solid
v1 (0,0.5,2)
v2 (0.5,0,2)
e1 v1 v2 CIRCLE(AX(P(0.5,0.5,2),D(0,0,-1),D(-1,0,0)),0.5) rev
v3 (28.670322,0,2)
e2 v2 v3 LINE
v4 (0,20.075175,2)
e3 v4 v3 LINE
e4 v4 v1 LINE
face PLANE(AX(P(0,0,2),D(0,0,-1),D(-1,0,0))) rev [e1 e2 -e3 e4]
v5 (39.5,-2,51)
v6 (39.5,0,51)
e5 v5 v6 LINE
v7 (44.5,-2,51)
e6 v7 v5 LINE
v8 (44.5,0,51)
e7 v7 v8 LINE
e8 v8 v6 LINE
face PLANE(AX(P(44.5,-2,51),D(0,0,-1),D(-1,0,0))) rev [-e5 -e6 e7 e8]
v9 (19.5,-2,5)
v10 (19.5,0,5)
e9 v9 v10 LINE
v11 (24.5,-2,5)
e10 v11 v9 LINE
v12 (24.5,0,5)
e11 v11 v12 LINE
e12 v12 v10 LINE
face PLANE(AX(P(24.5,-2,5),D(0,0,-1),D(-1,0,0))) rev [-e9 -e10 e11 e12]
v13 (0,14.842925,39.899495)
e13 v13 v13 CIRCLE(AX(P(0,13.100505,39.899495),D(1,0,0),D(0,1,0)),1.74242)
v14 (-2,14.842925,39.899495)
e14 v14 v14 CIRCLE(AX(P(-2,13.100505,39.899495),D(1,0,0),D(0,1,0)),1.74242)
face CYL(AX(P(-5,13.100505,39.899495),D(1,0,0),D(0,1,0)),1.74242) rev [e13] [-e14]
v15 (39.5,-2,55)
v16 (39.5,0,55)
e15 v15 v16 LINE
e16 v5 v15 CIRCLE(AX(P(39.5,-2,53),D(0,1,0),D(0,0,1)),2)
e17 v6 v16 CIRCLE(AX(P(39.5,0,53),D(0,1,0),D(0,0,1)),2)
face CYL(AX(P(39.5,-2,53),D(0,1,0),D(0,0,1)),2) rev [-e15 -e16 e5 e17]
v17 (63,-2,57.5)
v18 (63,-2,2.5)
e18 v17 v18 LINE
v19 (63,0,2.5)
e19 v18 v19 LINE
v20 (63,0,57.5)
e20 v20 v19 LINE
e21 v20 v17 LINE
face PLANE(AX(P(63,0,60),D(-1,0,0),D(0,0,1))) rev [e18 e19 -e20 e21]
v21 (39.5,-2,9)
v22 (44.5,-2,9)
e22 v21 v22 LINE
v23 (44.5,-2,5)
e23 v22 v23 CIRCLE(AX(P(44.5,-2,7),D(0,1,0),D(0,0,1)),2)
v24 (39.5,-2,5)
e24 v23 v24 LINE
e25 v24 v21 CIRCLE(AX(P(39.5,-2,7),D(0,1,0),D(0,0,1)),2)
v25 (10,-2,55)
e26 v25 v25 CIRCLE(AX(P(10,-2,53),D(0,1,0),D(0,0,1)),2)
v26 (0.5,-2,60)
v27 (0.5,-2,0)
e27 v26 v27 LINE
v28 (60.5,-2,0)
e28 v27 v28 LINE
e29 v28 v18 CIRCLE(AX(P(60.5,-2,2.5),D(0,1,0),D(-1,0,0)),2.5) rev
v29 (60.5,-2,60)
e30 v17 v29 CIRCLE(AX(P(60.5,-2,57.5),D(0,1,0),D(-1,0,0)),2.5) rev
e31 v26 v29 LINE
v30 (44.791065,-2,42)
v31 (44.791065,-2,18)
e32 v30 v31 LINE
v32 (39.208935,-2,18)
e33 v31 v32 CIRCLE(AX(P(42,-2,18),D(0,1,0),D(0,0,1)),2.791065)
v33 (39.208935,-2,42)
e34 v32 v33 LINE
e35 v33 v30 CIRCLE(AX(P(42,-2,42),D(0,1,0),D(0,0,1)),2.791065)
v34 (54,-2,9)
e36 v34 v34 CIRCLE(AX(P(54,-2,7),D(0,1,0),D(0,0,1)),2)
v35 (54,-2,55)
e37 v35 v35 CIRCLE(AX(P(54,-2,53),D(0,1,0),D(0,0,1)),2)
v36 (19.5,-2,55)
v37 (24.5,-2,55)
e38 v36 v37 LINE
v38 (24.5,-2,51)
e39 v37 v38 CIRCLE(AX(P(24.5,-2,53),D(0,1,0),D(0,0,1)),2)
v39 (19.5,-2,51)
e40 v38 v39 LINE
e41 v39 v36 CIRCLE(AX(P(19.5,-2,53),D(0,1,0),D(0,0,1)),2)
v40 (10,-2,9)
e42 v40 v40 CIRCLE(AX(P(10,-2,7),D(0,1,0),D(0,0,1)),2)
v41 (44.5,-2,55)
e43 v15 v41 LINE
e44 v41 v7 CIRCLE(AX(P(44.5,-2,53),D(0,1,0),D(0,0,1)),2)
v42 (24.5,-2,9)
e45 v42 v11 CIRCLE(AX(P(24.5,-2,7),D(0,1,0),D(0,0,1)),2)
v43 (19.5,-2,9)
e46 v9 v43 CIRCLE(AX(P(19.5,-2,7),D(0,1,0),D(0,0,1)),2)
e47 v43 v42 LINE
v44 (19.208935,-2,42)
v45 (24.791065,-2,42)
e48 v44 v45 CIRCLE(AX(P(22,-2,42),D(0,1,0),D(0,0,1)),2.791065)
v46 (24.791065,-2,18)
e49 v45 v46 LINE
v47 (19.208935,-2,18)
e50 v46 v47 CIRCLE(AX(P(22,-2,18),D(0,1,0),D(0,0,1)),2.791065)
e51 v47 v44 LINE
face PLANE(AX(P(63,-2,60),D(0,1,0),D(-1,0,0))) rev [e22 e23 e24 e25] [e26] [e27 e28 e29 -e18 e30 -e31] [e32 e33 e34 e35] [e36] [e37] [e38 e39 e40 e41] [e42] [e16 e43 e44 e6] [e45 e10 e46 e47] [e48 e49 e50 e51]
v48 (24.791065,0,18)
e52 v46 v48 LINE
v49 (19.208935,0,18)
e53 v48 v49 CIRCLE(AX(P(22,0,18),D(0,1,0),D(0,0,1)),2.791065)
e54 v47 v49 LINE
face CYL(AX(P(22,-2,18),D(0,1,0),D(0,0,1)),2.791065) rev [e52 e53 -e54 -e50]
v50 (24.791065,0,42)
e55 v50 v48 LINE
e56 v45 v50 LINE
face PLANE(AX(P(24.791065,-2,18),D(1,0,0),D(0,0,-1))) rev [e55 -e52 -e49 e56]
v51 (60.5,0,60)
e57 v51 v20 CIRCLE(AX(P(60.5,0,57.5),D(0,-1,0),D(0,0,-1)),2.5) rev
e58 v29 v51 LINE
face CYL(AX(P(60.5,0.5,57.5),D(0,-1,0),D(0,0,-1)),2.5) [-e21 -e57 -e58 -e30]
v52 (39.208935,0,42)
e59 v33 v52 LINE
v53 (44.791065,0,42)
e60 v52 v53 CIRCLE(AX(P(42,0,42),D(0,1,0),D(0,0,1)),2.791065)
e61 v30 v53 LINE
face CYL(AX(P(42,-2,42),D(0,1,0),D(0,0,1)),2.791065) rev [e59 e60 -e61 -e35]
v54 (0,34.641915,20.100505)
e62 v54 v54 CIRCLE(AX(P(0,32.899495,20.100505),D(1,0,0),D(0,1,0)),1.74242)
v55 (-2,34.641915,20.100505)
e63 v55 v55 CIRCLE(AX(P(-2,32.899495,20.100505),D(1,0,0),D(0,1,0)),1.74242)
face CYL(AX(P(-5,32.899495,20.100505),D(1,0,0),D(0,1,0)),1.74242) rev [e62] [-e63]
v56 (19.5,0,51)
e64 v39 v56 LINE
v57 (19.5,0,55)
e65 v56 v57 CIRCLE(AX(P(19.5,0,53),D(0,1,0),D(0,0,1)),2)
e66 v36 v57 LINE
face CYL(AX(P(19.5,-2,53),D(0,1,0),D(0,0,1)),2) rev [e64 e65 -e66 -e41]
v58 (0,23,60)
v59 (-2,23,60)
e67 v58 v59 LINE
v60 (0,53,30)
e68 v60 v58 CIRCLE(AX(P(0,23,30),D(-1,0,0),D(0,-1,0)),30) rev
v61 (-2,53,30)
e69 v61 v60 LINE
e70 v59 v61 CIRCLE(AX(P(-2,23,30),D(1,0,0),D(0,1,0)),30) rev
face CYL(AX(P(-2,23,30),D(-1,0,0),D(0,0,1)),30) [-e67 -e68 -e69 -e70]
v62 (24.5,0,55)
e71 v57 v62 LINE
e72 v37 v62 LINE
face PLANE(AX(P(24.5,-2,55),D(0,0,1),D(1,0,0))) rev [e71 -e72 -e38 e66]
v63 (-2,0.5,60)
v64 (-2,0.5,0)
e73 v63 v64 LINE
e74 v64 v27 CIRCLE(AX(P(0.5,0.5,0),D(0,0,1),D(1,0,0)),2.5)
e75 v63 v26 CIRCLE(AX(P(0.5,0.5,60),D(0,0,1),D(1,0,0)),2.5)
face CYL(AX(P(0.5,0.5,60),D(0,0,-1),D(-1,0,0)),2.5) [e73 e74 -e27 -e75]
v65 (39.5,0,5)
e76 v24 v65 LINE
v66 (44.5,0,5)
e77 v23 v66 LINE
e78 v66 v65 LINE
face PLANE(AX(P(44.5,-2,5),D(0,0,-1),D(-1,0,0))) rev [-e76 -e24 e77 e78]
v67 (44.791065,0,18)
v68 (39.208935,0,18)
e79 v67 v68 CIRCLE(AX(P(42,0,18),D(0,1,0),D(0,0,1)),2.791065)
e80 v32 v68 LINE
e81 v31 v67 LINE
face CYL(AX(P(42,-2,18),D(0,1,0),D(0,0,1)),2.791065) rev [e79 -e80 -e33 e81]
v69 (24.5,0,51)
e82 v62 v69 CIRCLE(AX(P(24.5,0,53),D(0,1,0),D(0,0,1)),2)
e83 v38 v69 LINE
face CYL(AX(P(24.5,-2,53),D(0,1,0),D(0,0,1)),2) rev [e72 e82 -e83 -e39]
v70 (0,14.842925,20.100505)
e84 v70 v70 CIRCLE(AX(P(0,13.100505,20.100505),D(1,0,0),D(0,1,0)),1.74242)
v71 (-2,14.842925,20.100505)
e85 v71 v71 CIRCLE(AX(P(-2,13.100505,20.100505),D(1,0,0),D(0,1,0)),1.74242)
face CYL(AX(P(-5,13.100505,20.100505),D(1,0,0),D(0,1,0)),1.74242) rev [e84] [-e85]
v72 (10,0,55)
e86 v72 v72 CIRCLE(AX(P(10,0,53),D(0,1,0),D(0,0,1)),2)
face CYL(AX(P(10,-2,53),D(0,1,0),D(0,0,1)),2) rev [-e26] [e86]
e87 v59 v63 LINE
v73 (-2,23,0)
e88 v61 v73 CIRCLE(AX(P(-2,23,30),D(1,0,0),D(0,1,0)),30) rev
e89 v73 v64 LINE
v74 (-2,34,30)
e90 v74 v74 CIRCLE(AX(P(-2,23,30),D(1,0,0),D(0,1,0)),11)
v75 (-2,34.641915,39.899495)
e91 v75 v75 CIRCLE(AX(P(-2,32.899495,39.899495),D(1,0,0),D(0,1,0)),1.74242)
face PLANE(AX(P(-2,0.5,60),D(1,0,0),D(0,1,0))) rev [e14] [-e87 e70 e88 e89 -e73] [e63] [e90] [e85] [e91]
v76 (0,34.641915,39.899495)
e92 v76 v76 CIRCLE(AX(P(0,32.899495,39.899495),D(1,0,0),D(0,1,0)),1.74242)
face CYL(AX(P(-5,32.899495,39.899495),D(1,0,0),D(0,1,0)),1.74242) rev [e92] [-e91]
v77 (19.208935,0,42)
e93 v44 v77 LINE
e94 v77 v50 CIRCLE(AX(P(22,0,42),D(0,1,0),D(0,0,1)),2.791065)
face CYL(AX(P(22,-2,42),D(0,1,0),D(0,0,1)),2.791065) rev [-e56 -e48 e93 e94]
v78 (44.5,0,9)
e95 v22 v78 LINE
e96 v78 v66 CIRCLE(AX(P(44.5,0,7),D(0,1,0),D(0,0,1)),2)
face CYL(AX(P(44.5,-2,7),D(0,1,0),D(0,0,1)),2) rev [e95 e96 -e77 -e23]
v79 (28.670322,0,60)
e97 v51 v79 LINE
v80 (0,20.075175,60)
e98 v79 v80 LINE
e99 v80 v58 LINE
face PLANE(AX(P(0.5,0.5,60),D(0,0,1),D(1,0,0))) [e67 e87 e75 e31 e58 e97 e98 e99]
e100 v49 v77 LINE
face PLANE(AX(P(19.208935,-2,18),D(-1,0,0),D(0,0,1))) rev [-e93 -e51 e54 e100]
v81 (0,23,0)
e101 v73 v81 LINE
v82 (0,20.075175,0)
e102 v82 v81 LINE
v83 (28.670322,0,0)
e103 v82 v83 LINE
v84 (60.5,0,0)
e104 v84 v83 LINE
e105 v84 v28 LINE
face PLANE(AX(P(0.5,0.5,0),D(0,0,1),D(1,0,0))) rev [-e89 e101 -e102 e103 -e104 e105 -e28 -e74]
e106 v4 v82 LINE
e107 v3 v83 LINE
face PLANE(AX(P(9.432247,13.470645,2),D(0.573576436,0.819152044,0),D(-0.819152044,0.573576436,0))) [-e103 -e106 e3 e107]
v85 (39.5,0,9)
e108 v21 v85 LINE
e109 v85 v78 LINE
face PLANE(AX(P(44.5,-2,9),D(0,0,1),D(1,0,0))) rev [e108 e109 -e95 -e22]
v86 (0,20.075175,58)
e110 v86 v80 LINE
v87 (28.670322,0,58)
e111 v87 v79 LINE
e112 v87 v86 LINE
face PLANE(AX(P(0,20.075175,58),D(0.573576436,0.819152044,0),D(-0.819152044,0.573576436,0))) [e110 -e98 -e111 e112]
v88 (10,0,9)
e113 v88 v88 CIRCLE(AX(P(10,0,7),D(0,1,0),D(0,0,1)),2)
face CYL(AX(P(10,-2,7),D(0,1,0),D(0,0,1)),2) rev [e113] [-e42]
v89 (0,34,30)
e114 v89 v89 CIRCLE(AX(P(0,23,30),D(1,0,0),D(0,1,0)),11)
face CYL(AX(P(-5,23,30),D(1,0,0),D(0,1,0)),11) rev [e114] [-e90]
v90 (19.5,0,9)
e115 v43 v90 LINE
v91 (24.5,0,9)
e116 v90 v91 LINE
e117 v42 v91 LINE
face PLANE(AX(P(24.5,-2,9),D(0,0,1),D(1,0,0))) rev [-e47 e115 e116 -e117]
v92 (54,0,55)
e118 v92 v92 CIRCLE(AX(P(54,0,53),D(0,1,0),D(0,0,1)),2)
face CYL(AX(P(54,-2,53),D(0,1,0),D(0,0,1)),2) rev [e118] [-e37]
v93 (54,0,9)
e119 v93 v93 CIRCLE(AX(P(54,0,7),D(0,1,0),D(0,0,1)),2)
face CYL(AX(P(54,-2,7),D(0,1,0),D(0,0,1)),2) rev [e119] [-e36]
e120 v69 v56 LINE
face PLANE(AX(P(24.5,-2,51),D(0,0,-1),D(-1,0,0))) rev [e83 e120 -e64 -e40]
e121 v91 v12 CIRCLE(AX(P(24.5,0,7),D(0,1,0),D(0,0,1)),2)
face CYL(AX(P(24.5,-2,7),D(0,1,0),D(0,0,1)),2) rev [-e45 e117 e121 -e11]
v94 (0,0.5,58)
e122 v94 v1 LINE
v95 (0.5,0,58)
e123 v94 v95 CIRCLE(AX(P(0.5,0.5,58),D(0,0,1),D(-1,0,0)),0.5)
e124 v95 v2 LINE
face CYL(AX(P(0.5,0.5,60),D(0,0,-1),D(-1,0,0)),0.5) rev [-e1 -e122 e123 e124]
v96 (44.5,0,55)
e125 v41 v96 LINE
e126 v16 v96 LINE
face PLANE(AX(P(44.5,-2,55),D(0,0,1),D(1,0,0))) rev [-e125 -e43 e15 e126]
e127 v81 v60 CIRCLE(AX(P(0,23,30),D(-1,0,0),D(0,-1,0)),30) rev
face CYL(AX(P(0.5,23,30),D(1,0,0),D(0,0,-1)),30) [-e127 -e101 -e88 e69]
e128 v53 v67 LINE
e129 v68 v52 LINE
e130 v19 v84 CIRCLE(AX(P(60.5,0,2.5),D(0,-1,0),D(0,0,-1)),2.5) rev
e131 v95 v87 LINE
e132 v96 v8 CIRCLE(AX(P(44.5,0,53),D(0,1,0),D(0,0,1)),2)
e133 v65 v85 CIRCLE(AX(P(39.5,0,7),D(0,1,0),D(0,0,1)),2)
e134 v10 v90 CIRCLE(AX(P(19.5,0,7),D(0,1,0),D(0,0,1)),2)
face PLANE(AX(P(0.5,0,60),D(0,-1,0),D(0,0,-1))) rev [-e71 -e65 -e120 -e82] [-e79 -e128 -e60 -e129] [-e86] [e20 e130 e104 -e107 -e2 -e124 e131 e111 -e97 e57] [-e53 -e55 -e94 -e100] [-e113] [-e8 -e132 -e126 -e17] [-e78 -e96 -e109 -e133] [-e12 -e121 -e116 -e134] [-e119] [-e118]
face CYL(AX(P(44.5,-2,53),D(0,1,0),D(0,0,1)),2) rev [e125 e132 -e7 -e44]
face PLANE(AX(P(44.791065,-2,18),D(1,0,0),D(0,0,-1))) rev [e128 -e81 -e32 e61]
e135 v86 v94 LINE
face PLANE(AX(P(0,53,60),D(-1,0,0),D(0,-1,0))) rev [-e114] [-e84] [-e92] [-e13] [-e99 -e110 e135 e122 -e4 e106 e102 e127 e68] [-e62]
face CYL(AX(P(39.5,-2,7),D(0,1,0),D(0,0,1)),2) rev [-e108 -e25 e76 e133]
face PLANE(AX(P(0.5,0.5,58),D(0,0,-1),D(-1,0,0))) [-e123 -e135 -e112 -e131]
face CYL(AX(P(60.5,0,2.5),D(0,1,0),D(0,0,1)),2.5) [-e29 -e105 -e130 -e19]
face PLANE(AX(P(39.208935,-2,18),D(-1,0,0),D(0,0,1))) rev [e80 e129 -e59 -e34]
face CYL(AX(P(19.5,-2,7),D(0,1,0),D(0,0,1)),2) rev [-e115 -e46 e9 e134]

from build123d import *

# Parameters (mm, degrees)
BOSS_EXTRUDE1_DEPTH = 60
FILLET2_R           = 2.5
FILLET3_R           = 2.5
FILLET4_R           = 30
FILLET5_R           = 30
SKETCH3_R           = 11
SKETCH3_R_2         = 1.742420083
CUT_EXTRUDE1_DEPTH  = 5
BOSS_EXTRUDE3_START = -2
BOSS_EXTRUDE3_DEPTH = 2
BOSS_EXTRUDE4_DEPTH = 2
SKETCH7_R           = 2
CUT_EXTRUDE2_DEPTH  = 2


with BuildPart() as part:
    # Sketch2 → Boss-Extrude1 (new body)
    with BuildSketch(Plane.XY):
        with BuildLine():
            Line((0.5, 0), (63, 0))
            Line((63, 0), (63, -2))
            Line((63, -2), (0.5, -2))
            ThreePointArc((0.5, -2), (-1.267766953, -1.267766953), (-2, 0.5))
            Line((-2, 0.5), (-2, 53))
            Line((-2, 53), (0, 53))
            Line((0, 53), (0, 0.5))
            ThreePointArc((0, 0.5), (0.146446609, 0.146446609), (0.5, 0))
        make_face()
    extrude(amount=BOSS_EXTRUDE1_DEPTH)

    # Fillet2
    fillet2_edges = [part.edges().sort_by_distance(p)[0] for p in [
        (63, -1, 60),
    ]]
    fillet(fillet2_edges, radius=FILLET2_R)

    # Fillet3
    fillet3_edges = [part.edges().sort_by_distance(p)[0] for p in [
        (63, -1, 0),
    ]]
    fillet(fillet3_edges, radius=FILLET3_R)

    # Fillet4
    fillet4_edges = [part.edges().sort_by_distance(p)[0] for p in [
        (-1, 53, 60),
    ]]
    fillet(fillet4_edges, radius=FILLET4_R)

    # Fillet5
    fillet5_edges = [part.edges().sort_by_distance(p)[0] for p in [
        (-1, 53, 0),
    ]]
    fillet(fillet5_edges, radius=FILLET5_R - 0.0001)  # a hair under: the kernel refuses the full size

    # Sketch3 → Cut-Extrude1 (cut)
    with BuildSketch(Plane(origin=(0, 0, 0), x_dir=(0, 0, -1), z_dir=(1, 0, 0))):
        with Locations(Location((-30, 23, 0), (0, 0, 90))):
            Circle(SKETCH3_R)
        with Locations(Location((-39.899494937, 13.100505063, 0), (0, 0, 90))):
            Circle(SKETCH3_R_2)
        with Locations(Location((-39.899494937, 32.899494937, 0), (0, 0, 90))):
            Circle(SKETCH3_R_2)
        with Locations(Location((-20.100505063, 32.899494937, 0), (0, 0, 90))):
            Circle(SKETCH3_R_2)
        with Locations(Location((-20.100505063, 13.100505063, 0), (0, 0, 90))):
            Circle(SKETCH3_R_2)
    extrude(amount=-CUT_EXTRUDE1_DEPTH, mode=Mode.SUBTRACT)

    # Sketch4 → Boss-Extrude3 (add)
    with BuildSketch(Plane.XY.offset(60).offset(BOSS_EXTRUDE3_START)):
        with BuildLine():
            Line((0, 20.075175272), (28.67032155, 0))
            Line((28.67032155, 0), (0.5, 0))
            ThreePointArc((0.5, 0), (0.146446609, 0.146446609), (0, 0.5))
            Line((0, 0.5), (0, 20.075175272))
        make_face()
    extrude(amount=BOSS_EXTRUDE3_DEPTH)

    # Sketch6 → Boss-Extrude4 (add)
    with BuildSketch(Plane(origin=(0, 0, 0), x_dir=(-1, 0, 0), z_dir=(0, 0, -1))):
        with BuildLine():
            Line((0, 0.5), (0, 20.075175272))
            Line((0, 20.075175272), (-28.67032155, 0))
            Line((-28.67032155, 0), (-0.5, 0))
            ThreePointArc((-0.5, 0), (-0.146446609, 0.146446609), (0, 0.5))
        make_face()
    extrude(amount=-BOSS_EXTRUDE4_DEPTH)

    # Sketch7 → Cut-Extrude2 (cut)
    with BuildSketch(Plane(origin=(0, 0, 0), x_dir=(1, 0, 0), z_dir=(0, 1, 0))):
        with Locations(Location((54, -53, 0), (0, 0, 270))):
            Circle(SKETCH7_R)
        with Locations(Location((54, -7, 0), (0, 0, 270))):
            Circle(SKETCH7_R)
        with Locations(Location((10, -7, 0), (0, 0, 270))):
            Circle(SKETCH7_R)
        with Locations(Location((10, -53, 0), (0, 0, 270))):
            Circle(SKETCH7_R)
        with BuildLine():
            Line((44.5, -55), (39.5, -55))
            ThreePointArc((39.5, -55), (37.5, -53), (39.5, -51))
            Line((39.5, -51), (44.5, -51))
            ThreePointArc((44.5, -51), (46.5, -53), (44.5, -55))
        make_face()
        with BuildLine():
            Line((44.5, -9), (39.5, -9))
            ThreePointArc((39.5, -9), (37.5, -7), (39.5, -5))
            Line((39.5, -5), (44.5, -5))
            ThreePointArc((44.5, -5), (46.5, -7), (44.5, -9))
        make_face()
        with BuildLine():
            Line((24.5, -9), (19.5, -9))
            ThreePointArc((19.5, -9), (17.5, -7), (19.5, -5))
            Line((19.5, -5), (24.5, -5))
            ThreePointArc((24.5, -5), (26.5, -7), (24.5, -9))
        make_face()
        with BuildLine():
            Line((24.5, -55), (19.5, -55))
            ThreePointArc((19.5, -55), (17.5, -53), (19.5, -51))
            Line((19.5, -51), (24.5, -51))
            ThreePointArc((24.5, -51), (26.5, -53), (24.5, -55))
        make_face()
        with BuildLine():
            Line((24.79106514, -18), (24.79106514, -42))
            ThreePointArc((24.79106514, -42), (22, -44.79106514), (19.20893486, -42))
            Line((19.20893486, -42), (19.20893486, -18))
            ThreePointArc((19.20893486, -18), (22, -15.20893486), (24.79106514, -18))
        make_face()
        with BuildLine():
            Line((44.79106514, -18), (44.79106514, -42))
            ThreePointArc((44.79106514, -42), (42, -44.79106514), (39.20893486, -42))
            Line((39.20893486, -42), (39.20893486, -18))
            ThreePointArc((39.20893486, -18), (42, -15.20893486), (44.79106514, -18))
        make_face()
    extrude(amount=-CUT_EXTRUDE2_DEPTH, mode=Mode.SUBTRACT)


solid = part.part
